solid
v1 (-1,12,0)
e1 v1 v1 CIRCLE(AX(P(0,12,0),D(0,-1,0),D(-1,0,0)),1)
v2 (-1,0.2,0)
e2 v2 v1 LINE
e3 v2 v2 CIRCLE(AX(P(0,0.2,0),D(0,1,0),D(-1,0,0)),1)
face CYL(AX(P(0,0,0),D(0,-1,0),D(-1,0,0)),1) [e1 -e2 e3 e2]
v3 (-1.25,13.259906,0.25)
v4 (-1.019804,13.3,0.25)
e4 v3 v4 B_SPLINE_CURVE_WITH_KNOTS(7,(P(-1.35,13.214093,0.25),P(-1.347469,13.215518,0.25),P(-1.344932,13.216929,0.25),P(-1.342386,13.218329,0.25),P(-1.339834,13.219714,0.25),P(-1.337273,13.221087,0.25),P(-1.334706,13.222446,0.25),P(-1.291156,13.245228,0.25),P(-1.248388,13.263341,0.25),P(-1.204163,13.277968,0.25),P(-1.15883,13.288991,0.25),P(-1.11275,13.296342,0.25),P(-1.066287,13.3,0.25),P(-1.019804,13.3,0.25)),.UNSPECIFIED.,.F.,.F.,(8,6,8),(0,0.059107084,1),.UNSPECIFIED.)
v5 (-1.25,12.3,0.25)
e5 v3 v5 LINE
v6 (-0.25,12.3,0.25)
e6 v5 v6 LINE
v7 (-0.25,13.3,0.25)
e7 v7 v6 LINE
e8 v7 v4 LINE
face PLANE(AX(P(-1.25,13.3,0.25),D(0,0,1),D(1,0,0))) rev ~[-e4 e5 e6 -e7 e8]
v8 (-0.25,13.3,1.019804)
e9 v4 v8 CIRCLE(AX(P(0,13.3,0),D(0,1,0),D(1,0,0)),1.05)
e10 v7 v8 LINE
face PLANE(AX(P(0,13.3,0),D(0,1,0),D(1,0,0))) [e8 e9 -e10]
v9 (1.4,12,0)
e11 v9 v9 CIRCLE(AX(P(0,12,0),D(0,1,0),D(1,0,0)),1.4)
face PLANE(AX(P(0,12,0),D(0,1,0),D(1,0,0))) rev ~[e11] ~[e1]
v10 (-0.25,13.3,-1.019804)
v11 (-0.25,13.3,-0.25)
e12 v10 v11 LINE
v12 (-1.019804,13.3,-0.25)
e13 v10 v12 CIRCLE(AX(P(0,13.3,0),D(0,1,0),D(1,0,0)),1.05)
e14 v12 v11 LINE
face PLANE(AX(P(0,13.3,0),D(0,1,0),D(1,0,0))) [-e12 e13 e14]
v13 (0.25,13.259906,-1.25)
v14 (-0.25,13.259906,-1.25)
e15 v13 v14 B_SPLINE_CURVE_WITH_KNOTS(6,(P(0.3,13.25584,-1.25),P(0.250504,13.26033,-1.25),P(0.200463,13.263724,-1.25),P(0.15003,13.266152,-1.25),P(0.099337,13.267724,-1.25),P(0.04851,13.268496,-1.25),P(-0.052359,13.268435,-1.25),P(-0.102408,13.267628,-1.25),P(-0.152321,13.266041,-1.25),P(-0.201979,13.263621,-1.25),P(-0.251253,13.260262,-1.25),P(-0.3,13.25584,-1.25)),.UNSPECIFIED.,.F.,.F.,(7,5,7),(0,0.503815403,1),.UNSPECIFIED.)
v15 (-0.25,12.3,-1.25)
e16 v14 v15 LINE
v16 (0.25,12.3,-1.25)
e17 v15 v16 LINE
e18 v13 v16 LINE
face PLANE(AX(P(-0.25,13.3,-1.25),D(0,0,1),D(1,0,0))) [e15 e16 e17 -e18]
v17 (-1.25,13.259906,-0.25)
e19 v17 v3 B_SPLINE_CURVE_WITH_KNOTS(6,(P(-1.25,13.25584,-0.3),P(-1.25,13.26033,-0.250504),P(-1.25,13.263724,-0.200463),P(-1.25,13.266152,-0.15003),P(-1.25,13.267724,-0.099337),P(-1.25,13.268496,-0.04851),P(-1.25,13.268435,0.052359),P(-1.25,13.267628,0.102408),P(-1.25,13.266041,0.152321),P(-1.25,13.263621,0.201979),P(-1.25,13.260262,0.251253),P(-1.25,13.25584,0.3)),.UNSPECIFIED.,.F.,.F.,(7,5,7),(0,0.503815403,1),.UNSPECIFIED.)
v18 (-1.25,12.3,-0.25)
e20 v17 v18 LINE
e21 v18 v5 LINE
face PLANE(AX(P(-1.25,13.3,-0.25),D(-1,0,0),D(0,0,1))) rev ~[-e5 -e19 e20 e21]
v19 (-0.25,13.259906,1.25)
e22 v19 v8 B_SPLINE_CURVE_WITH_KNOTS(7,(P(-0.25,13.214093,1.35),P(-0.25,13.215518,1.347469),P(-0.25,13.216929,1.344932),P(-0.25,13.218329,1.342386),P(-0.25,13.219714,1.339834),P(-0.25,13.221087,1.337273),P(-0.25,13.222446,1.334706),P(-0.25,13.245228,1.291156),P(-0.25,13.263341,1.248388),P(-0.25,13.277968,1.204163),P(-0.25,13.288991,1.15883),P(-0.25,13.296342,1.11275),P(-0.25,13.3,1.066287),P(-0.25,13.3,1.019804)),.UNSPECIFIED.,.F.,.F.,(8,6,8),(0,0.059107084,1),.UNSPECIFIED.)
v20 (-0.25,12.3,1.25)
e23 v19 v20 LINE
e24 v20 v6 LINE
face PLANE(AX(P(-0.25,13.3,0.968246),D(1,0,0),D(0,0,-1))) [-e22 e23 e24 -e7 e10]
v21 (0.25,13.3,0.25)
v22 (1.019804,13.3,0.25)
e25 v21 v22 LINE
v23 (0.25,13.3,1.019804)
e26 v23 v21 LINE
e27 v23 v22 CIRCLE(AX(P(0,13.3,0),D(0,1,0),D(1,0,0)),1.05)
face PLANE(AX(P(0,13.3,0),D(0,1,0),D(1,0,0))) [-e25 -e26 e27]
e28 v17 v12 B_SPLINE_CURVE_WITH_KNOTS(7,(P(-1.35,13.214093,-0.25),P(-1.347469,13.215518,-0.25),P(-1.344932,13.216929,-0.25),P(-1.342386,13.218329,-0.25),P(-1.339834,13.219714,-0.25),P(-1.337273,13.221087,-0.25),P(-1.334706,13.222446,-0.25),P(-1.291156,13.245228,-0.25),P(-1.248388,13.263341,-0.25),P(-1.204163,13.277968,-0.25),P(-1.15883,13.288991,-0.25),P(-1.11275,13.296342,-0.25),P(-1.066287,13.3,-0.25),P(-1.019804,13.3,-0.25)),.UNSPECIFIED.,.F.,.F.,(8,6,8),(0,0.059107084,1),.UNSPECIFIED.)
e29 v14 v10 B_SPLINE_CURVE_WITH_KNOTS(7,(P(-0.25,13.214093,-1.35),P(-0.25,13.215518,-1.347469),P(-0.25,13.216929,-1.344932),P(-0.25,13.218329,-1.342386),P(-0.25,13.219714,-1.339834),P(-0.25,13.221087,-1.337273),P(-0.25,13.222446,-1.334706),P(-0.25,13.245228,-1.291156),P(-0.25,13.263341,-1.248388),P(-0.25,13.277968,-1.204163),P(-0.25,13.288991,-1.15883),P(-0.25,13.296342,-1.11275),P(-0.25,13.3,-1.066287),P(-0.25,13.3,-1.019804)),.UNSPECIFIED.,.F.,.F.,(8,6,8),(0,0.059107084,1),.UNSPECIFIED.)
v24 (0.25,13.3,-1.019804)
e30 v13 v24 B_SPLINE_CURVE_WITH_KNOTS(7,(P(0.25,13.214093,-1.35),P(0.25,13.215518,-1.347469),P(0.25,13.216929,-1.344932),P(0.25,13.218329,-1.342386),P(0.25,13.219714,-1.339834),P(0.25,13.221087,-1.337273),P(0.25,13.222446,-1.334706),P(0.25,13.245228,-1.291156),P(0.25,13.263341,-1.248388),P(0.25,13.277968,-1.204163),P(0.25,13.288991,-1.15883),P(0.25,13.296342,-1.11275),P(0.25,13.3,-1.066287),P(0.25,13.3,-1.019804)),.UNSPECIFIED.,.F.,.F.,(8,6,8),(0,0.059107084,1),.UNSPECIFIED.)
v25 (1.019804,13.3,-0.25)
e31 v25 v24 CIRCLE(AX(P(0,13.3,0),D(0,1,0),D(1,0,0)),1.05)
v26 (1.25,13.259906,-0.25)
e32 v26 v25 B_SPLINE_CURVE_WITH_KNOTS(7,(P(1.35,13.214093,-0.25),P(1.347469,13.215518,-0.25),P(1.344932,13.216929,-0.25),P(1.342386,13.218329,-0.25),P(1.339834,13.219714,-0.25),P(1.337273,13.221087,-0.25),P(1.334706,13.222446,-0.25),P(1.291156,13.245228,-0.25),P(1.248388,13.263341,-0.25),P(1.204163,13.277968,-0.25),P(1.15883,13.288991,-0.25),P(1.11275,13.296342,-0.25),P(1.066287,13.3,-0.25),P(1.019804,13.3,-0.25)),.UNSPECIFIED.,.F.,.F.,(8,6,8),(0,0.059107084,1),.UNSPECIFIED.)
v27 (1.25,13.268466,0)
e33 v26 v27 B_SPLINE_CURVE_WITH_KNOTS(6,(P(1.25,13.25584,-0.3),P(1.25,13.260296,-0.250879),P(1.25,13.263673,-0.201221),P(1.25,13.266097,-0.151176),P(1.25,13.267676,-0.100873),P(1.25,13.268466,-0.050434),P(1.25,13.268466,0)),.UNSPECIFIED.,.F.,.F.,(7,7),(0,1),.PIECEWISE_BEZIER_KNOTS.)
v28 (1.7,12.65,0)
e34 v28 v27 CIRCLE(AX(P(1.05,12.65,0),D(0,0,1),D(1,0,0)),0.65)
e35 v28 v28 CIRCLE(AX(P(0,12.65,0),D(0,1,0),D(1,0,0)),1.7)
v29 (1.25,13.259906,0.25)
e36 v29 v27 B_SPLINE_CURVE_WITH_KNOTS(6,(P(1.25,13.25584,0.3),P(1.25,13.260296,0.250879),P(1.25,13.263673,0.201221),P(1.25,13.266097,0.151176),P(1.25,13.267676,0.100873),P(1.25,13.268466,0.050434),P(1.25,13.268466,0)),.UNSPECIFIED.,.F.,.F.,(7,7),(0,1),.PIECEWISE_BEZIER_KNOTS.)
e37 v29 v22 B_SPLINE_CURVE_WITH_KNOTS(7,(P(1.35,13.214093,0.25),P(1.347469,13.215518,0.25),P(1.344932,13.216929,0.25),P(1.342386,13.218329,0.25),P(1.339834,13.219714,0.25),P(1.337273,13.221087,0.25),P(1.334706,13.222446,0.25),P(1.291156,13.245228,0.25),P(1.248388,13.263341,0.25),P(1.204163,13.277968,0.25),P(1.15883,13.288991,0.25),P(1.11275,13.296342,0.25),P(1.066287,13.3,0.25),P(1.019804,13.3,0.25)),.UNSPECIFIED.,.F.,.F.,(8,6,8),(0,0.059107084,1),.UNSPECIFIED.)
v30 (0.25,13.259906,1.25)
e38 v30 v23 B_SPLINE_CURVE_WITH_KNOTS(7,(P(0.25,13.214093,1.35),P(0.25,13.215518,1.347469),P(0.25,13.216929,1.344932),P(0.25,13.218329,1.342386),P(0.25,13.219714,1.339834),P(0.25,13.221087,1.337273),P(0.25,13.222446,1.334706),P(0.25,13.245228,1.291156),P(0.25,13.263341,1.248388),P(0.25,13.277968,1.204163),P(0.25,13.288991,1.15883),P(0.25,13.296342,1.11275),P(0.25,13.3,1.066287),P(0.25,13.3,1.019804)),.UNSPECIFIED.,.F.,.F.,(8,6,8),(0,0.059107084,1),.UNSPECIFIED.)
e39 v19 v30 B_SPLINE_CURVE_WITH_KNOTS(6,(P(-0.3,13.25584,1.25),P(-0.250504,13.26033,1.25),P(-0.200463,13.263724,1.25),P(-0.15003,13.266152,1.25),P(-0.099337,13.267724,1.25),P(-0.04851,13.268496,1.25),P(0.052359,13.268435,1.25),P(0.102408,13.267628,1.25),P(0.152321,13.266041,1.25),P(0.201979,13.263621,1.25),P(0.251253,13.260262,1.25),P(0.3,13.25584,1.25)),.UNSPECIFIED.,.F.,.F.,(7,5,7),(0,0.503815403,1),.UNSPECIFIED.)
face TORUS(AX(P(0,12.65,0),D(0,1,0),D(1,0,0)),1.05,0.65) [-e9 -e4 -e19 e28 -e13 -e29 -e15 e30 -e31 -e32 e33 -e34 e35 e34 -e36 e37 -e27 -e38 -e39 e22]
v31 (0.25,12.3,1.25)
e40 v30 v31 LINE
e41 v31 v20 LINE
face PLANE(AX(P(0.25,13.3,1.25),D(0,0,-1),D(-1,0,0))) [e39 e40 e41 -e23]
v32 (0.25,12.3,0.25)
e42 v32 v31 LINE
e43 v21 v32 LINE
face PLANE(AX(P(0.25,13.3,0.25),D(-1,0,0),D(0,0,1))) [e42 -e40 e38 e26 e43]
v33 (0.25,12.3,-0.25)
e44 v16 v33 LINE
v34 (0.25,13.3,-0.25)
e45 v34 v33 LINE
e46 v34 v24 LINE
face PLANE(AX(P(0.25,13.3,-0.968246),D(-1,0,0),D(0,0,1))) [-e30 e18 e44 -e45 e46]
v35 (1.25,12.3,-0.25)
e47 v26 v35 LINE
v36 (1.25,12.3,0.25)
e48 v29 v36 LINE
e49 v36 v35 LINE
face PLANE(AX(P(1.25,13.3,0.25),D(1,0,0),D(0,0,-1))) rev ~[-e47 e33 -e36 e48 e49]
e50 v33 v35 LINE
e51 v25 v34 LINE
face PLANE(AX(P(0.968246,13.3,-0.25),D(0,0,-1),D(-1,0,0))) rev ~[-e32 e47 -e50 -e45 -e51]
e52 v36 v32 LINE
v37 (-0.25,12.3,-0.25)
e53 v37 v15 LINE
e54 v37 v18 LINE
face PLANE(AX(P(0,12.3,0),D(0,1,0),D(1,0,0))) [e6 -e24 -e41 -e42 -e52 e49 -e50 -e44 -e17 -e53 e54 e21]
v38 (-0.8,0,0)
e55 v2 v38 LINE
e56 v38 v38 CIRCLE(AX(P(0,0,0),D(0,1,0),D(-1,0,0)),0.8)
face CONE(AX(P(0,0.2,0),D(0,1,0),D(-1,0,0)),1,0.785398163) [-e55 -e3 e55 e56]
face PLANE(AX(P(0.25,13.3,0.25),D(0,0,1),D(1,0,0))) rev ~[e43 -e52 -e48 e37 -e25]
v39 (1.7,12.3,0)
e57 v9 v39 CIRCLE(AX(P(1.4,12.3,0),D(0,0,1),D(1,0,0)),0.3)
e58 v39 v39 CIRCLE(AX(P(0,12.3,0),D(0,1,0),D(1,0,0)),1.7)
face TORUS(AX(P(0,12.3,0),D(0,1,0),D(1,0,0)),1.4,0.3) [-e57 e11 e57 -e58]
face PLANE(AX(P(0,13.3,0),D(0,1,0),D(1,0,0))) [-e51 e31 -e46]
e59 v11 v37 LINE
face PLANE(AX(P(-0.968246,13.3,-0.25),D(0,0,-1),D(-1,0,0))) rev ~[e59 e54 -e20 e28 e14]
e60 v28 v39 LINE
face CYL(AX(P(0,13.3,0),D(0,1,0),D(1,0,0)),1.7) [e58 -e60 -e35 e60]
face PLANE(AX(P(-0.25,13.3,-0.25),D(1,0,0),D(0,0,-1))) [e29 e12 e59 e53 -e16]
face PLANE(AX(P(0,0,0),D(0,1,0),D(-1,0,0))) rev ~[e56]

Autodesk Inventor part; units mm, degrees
ref_plane "YZ Plane" through (0, 0, 0) normal (1, 0, 0) x (0, 1, 0)
ref_plane "XZ Plane" through (0, 0, 0) normal (0, 1, 0) x (-1, 0, 0)
ref_plane "XY Plane" through (0, 0, 0) normal (0, 0, 1) x (1, 0, 0)
sketch "Sketch1" plane through (0, 0, 0) normal (0, 1, 0) x (-1, 0, 0)
  circle A0 centre (0, 0) radius 1
  dimension "d0" = 2
extrude "Extrusion1" add sketch "Sketch1" along normal blind 13.3
sketch "Sketch2" plane through (0, 13.3, 0) normal (0, 1, 0) x (1, 0, 0)
  circle A0 centre (0, 0) radius 1 projected
  circle A1 centre (0, 0) radius 1.7
  dimension "d3" = 3.4
extrude "Extrusion2" add sketch "Sketch2" against normal blind 1.3 contours A0 | A1
thread "Thread1" size "M2x0.4" class "6g" standard "ANSI Metric M Profile" full length
sketch "Sketch3" plane through (0, 13.3, 0) normal (0, 1, 0) x (1, 0, 0)
  line L0 (-1.25, -0.25) -> (1.25, -0.25)
  line L1 (1.25, -0.25) -> (1.25, 0.25)
  line L2 (1.25, 0.25) -> (-1.25, 0.25)
  line L3 (-1.25, 0.25) -> (-1.25, -0.25)
  line L4 (-1.25, -0.25) -> (1.25, 0.25) construction
  line L5 (1.25, -0.25) -> (-1.25, 0.25) construction
  line L6 (-0.25, 1.25) -> (0.25, 1.25)
  line L7 (0.25, 1.25) -> (0.25, -1.25)
  line L8 (0.25, -1.25) -> (-0.25, -1.25)
  line L9 (-0.25, -1.25) -> (-0.25, 1.25)
  circle A0 centre (0, 0) radius 1 projected
  line L10 (-0.25, 1.25) -> (0.25, -1.25) construction
  line L11 (0.25, 1.25) -> (-0.25, -1.25) construction
  point P0 (-0.25, -0.25)
  point P1 (0.25, -0.25)
  point P2 (0.25, 0.25)
  point P3 (-0.25, 0.25)
  dimension "d8" = 2.5
  dimension "d9" = 0.5
  dimension "d10" = 0.5
  dimension "d11" = 2.5
extrude "Extrusion3" cut sketch "Sketch3" against normal blind 1 contours L3 L2 A0 L0 | A0 L2 L9 L0 | L9 L2 L7 L0 | L0 L7 A0 L9 | A0 L7 L8 L9 | L7 L2 A0 L0 | L9 A0 L7 L2 | L9 L6 L7 A0 | A0 L2 L1 L0
chamfer "Chamfer1" distance 0.2 angle 45 1 edges at (1, 0, 0)
fillet "Fillet1" radius 0.65 1 edges at (-1.7, 13.3, 0)
fillet "Fillet2" radius 0.3 1 edges at (-1.7, 12, 0)
properties part number "M2_Short_Bolt"
